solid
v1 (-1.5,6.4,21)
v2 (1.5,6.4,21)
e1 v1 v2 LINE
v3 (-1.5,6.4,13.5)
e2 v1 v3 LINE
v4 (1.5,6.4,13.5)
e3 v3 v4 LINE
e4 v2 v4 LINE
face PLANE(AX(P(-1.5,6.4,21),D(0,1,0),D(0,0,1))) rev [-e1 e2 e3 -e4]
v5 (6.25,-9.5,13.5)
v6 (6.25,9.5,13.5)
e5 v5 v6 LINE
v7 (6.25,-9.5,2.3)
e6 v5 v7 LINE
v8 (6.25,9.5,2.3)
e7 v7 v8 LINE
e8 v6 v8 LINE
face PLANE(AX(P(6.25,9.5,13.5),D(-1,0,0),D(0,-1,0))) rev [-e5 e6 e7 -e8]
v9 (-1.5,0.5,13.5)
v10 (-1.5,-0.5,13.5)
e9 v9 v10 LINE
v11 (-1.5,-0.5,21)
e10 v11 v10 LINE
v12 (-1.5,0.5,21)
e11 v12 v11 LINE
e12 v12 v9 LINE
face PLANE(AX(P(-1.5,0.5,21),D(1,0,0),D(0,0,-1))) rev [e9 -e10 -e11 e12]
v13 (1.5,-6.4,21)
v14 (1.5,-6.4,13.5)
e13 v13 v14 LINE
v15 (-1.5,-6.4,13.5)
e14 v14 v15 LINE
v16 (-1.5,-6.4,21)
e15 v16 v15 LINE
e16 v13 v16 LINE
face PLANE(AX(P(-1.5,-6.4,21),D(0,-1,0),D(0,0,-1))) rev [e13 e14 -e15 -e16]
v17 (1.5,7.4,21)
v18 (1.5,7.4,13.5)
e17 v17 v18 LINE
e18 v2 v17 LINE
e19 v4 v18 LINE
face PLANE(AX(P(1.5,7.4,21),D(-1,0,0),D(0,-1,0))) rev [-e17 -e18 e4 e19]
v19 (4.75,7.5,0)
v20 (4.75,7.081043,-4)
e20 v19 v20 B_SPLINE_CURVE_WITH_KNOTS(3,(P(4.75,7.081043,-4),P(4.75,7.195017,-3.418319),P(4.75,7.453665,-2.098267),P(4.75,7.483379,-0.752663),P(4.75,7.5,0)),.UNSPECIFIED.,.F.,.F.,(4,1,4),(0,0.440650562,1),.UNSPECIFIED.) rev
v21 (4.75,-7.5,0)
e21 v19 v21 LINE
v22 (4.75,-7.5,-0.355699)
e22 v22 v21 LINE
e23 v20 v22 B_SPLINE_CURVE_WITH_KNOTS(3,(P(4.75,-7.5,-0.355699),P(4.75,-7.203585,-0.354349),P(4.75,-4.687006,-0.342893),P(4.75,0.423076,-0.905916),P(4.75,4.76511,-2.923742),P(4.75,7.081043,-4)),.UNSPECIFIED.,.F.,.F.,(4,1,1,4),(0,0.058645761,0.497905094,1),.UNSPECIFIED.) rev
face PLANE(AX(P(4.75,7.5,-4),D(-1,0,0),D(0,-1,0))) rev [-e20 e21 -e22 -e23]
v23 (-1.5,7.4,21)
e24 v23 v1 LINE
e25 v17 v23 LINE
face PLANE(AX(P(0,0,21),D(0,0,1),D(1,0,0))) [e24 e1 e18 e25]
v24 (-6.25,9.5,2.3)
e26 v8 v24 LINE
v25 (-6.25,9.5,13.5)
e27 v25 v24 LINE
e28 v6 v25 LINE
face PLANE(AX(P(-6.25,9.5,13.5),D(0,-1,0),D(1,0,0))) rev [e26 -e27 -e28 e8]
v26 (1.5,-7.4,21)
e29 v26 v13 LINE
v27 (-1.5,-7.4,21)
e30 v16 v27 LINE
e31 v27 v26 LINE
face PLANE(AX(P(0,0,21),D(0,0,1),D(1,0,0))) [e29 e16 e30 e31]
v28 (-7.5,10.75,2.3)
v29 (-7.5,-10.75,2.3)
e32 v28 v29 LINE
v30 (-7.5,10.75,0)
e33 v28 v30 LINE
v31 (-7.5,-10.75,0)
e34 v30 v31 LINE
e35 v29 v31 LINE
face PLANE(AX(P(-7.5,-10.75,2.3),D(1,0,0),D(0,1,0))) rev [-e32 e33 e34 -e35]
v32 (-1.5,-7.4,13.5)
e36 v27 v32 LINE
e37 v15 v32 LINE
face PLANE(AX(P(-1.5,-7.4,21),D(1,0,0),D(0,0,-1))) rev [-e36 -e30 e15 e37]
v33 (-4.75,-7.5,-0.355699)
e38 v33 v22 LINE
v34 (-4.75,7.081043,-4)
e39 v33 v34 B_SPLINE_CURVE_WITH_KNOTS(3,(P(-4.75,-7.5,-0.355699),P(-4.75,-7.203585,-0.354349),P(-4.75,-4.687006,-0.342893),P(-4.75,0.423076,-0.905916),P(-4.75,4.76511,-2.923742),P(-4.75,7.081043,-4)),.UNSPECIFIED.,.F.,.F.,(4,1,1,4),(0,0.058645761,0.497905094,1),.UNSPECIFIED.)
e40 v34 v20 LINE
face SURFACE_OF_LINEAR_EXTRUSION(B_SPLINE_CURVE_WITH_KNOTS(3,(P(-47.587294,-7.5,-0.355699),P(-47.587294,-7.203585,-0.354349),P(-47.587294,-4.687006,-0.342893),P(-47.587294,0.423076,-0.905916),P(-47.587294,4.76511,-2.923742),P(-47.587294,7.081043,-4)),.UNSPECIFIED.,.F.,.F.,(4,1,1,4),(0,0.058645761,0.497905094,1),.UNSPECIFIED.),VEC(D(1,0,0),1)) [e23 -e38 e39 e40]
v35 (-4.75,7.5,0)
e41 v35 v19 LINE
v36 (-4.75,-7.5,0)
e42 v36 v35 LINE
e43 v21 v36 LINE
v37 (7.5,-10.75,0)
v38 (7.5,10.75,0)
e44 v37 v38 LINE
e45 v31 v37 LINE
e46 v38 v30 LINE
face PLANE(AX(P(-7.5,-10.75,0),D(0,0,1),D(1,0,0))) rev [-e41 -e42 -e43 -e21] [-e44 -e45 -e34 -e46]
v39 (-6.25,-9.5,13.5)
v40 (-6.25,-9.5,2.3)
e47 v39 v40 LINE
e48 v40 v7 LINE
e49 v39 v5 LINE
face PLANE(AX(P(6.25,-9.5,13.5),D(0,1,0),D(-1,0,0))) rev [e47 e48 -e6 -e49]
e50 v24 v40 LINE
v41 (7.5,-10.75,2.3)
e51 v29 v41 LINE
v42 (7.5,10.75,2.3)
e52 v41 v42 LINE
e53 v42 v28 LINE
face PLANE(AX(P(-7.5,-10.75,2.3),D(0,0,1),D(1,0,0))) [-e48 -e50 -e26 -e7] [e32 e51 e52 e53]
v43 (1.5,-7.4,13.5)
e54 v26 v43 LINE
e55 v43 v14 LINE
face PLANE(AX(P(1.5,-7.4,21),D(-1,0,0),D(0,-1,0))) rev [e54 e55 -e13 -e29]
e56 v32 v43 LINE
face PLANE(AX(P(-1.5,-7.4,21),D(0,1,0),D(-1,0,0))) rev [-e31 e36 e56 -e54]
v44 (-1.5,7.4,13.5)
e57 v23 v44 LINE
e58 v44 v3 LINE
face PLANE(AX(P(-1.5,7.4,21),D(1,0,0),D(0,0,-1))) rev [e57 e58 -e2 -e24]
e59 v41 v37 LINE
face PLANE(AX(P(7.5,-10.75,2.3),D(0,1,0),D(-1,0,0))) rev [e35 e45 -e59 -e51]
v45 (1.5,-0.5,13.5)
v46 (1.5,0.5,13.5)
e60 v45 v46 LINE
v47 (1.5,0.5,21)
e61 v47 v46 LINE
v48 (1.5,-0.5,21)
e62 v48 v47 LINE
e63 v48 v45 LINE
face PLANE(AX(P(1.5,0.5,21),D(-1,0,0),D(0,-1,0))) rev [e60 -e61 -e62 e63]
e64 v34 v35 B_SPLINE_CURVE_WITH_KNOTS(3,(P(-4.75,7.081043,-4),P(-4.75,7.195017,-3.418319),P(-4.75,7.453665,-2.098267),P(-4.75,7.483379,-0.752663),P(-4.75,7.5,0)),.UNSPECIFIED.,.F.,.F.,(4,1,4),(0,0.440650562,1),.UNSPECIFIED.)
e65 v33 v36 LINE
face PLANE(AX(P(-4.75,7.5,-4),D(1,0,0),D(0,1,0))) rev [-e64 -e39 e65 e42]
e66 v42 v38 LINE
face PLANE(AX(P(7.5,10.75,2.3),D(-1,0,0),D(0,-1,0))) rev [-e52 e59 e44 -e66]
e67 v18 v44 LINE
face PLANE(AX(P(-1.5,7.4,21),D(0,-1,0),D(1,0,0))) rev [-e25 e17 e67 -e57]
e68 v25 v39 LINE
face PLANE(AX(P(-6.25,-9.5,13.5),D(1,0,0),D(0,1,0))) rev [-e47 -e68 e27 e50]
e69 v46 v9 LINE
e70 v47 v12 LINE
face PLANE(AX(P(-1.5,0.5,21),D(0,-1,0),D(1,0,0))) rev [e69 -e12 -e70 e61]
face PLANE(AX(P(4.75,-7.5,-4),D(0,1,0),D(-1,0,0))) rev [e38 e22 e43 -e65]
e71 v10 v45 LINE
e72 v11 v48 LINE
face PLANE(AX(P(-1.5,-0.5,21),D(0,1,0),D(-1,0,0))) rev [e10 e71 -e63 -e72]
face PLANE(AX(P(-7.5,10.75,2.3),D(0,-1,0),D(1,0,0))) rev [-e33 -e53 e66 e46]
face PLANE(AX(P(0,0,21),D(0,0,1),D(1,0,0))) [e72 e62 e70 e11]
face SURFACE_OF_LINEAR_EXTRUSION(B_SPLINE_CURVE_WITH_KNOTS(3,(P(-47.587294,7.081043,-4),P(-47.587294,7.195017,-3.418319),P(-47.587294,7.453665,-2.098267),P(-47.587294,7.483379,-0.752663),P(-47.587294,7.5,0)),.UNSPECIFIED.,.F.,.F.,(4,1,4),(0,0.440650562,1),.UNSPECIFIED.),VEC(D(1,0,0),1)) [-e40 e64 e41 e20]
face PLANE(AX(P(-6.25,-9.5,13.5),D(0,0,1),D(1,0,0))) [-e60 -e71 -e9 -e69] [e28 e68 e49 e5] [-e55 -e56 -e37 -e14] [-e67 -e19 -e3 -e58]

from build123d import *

# Parameters (mm, degrees)
SKETCH_1_W          = 15
SKETCH_1_H          = 21.5
EXTRUDE_1_DEPTH     = 2.3
SKETCH_2_W          = 12.5
SKETCH_2_H          = 19
EXTRUDE_2_DEPTH     = 11.2
SKETCH_3_W          = 9.5
SKETCH_3_H          = 15
EXTRUDE_3_DEPTH     = 4
CUT_EXTRUDE_START   = -9.5
CUT_EXTRUDE_1_DEPTH = 9.5
SKETCH_6_W          = 3
SKETCH_6_H          = 1
EXTRUDE_1_2_DEPTH   = 7.5


# Read off the part's stored shape, not the designer's step: 切除-拉伸1
with BuildPart() as part:
    # 草图1 → Extrude 1 (new body)
    with BuildSketch(Plane.XY):
        Rectangle(SKETCH_1_W, SKETCH_1_H)
    extrude(amount=EXTRUDE_1_DEPTH)

    # 草图2 → 拉伸2 (add)
    with BuildSketch(Plane.XY.offset(2.3)):
        Rectangle(SKETCH_2_W, SKETCH_2_H)
    extrude(amount=EXTRUDE_2_DEPTH)

    # 草图3 → 拉伸3 (add)
    with BuildSketch(Plane(origin=(0, 0, 0), x_dir=(-1, 0, 0), z_dir=(0, 0, -1))):
        Rectangle(SKETCH_3_W, SKETCH_3_H)
    extrude(amount=EXTRUDE_3_DEPTH)

    # 切除-拉伸1 outline → 切除-拉伸1 (cut)
    with BuildSketch(Plane.ZY.offset(4.75).offset(CUT_EXTRUDE_START)):
        with BuildLine():
            Line((-4, -7.5), (-0.355698538, -7.5))
            add(Edge.make_bspline(
                [(-0.355698538, -7.5), (-0.354349182, -7.203584733), (-0.342893084, -4.687006069), (-0.90591647, 0.423075599), (-2.923742076, 4.765110149), (-4, 7.081043238)],
                knots=[0, 0, 0, 0, 0.058645761, 0.497905094, 1, 1, 1, 1], degree=3))
            Line((-4, 7.081043238), (-4, -7.5))
        make_face()
        with BuildLine():
            Line((-4, 7.5), (-4, 7.081043238))
            add(Edge.make_bspline(
                [(-4, 7.081043238), (-3.418318642, 7.19501669), (-2.098267317, 7.453664838), (-0.752663012, 7.483379257), (0, 7.5)],
                knots=[0, 0, 0, 0, 0.440650562, 1, 1, 1, 1], degree=3))
            Line((0, 7.5), (-4, 7.5))
        make_face()
    extrude(amount=CUT_EXTRUDE_1_DEPTH, mode=Mode.SUBTRACT)

    # 草图6 → Extrude 1 2 (add)
    with BuildSketch(Plane.XY.offset(13.5)):
        Rectangle(SKETCH_6_W, SKETCH_6_H)
        with Locations((0, 6.9)):
            Rectangle(SKETCH_6_W, SKETCH_6_H)
        with Locations((0, -6.9)):
            Rectangle(SKETCH_6_W, SKETCH_6_H)
    extrude(amount=EXTRUDE_1_2_DEPTH)


solid = part.part
